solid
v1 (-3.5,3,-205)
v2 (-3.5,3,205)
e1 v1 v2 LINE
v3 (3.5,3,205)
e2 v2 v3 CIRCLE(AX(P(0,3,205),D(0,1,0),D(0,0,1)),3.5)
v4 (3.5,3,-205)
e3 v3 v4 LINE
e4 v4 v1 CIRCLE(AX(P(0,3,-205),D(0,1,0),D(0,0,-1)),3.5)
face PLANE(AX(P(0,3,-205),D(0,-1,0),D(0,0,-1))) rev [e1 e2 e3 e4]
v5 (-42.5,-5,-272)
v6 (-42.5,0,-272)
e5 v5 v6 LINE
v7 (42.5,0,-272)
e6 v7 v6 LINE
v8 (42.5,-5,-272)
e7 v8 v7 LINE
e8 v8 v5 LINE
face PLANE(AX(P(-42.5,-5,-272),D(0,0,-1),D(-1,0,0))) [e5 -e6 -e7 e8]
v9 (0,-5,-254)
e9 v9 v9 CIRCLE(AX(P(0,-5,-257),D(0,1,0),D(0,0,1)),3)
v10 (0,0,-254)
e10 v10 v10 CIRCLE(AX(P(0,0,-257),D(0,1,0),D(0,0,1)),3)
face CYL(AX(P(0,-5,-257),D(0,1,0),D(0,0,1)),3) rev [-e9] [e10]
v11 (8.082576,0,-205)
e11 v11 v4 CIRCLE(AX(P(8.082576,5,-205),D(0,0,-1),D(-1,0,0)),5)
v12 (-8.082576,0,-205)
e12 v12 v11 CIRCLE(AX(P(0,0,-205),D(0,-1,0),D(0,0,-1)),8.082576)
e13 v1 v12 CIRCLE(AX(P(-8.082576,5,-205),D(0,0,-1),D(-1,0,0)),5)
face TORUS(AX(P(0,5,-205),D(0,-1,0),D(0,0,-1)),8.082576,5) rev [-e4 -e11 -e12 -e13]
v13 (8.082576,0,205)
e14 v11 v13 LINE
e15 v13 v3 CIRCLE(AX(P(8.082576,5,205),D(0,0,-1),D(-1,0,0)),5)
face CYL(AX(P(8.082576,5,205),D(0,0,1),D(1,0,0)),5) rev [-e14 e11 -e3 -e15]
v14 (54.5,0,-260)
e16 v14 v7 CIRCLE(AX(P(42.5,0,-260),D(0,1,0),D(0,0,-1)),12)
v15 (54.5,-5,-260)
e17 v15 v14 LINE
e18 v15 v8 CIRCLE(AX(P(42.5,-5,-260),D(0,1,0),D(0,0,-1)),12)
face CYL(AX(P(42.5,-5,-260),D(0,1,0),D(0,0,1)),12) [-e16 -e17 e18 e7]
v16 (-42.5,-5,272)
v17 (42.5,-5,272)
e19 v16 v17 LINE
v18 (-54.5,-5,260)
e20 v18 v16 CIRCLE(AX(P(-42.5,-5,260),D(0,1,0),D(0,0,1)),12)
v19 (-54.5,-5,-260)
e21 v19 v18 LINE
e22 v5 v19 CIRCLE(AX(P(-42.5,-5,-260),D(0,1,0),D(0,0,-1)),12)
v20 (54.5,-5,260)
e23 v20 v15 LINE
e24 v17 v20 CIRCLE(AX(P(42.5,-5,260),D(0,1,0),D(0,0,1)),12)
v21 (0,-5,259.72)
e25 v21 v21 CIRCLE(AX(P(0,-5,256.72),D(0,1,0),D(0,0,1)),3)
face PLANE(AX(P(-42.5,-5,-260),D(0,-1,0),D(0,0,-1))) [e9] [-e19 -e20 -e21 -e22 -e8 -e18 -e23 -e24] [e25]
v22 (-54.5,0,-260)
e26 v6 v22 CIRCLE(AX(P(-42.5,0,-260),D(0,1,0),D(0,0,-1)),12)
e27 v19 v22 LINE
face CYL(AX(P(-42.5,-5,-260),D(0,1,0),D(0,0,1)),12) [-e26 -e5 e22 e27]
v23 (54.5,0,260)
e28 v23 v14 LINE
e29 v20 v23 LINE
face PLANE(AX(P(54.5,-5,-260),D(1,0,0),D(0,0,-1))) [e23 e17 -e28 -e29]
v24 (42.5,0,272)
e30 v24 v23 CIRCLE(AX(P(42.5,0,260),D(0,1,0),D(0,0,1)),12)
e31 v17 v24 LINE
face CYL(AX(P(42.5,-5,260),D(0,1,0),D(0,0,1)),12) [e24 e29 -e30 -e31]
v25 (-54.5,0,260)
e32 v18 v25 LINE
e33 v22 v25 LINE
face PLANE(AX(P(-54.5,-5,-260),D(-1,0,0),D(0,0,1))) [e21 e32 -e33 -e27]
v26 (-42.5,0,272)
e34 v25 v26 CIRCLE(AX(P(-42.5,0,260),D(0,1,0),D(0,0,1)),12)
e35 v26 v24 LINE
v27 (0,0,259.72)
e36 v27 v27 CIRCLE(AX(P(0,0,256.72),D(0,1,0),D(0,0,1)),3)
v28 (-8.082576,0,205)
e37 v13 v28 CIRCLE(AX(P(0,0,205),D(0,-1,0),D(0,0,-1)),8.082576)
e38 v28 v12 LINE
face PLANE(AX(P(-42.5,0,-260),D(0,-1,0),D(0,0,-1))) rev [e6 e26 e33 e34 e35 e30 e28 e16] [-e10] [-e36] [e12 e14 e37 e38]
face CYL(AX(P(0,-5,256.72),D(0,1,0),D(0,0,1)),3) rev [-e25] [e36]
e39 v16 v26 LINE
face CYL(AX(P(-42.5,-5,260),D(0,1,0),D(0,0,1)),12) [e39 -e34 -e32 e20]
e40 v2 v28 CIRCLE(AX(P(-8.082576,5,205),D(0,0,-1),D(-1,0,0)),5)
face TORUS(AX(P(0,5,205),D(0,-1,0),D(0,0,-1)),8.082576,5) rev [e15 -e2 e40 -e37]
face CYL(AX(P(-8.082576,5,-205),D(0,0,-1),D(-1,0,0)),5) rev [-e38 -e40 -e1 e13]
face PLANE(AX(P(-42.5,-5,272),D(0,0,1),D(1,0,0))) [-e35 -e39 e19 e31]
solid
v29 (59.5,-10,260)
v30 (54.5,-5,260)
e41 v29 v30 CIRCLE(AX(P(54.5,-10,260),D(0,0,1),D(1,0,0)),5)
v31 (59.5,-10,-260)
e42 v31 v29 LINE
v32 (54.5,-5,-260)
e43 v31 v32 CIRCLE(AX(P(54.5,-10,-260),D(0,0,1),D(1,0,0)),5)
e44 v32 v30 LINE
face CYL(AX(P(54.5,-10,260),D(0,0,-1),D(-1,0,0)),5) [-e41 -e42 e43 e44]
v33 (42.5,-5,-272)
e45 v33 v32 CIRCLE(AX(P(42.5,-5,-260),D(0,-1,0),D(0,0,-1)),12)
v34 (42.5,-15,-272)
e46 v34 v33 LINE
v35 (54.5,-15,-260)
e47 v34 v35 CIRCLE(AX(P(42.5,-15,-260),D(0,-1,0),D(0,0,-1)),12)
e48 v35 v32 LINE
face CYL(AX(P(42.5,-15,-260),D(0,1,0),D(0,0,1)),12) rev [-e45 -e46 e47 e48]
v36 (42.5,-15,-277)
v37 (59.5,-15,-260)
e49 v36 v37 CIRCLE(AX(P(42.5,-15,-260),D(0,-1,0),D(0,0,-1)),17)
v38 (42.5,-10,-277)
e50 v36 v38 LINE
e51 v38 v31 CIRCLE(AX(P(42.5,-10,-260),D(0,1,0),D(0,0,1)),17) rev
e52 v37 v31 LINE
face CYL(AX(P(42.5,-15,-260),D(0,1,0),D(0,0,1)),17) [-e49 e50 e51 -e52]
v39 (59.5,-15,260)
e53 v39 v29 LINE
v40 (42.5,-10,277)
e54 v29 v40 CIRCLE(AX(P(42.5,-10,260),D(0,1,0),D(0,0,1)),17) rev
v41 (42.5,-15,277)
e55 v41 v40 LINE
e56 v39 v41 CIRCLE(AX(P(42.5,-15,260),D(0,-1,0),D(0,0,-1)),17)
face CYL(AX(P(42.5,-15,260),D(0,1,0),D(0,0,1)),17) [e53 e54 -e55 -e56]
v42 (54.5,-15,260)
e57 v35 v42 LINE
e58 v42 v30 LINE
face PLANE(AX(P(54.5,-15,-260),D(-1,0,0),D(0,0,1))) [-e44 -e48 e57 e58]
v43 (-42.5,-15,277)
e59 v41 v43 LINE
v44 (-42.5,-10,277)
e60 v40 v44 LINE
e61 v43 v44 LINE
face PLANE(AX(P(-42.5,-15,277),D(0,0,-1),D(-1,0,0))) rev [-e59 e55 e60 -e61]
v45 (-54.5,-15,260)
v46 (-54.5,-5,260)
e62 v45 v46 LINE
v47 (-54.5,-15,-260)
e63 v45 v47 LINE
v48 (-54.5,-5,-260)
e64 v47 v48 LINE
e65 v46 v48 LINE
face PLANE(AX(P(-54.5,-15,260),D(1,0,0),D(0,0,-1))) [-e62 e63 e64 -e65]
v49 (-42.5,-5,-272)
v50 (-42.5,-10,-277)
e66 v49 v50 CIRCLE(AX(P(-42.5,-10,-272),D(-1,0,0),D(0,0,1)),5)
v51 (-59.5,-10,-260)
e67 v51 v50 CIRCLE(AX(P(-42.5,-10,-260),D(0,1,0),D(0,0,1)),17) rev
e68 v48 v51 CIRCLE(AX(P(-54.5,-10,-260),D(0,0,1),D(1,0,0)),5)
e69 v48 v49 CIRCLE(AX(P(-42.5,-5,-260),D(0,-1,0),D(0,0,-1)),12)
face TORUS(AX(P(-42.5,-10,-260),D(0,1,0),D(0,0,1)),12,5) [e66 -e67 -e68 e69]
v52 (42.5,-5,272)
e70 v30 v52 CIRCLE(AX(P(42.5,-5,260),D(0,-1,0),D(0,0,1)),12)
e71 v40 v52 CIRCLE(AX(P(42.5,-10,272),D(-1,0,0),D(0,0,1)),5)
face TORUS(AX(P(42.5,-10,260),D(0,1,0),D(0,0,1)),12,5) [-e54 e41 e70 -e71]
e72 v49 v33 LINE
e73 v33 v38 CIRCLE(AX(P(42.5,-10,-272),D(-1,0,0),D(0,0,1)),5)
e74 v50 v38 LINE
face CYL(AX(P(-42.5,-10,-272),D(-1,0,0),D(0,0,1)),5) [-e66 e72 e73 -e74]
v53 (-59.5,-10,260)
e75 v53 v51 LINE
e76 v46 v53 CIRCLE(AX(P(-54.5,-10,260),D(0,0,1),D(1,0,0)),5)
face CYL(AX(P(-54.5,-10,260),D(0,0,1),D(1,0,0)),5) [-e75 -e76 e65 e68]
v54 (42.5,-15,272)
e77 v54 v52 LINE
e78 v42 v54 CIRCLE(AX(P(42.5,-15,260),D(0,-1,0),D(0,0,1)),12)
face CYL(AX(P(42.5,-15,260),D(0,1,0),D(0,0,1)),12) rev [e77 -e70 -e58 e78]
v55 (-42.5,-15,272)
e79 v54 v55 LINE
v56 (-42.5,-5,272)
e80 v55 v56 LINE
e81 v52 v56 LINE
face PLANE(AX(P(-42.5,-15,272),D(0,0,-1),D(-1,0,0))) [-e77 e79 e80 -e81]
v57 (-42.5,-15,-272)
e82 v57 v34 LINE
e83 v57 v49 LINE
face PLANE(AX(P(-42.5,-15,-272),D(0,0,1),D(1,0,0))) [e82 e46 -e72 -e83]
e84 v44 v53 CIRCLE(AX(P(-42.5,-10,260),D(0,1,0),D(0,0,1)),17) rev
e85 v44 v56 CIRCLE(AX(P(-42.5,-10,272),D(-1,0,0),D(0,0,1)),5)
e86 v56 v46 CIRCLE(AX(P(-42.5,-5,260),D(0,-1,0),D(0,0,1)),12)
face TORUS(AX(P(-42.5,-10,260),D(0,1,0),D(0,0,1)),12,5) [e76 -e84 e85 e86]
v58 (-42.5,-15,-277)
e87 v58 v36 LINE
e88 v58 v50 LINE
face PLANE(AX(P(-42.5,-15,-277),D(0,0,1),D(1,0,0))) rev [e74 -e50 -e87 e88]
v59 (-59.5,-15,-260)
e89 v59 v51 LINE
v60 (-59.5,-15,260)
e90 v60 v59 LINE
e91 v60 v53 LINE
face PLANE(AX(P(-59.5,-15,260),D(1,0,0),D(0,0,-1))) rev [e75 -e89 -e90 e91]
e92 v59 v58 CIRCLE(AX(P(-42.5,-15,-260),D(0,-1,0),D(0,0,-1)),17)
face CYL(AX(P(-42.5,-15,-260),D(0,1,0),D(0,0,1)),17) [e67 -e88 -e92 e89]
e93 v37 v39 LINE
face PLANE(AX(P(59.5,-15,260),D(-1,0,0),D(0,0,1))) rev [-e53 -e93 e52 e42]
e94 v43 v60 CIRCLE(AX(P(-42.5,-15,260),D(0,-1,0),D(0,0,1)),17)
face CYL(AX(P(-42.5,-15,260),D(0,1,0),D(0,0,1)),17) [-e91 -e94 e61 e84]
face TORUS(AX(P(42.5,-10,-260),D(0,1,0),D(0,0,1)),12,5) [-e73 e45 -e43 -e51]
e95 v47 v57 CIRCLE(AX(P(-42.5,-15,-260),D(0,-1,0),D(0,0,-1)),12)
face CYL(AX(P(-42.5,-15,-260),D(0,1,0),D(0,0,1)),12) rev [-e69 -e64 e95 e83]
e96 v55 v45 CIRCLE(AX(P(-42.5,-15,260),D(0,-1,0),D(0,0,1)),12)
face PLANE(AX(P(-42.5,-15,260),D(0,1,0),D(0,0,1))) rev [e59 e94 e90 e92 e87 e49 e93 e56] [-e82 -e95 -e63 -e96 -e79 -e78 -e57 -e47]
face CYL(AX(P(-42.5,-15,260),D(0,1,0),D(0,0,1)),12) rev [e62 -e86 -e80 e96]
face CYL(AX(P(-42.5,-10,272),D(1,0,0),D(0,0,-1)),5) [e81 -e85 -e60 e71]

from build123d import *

# Parameters (mm, degrees)
SKETCH3_R           = 3
BOSS_EXTRUDE3_DEPTH = 5
BOSS_EXTRUDE4_DEPTH = 3
FILLET5_R           = 5
BOSS_EXTRUDE5_DEPTH = 10
FILLET7_R           = 5


# Some blends are built 0.0001 mm under size
with BuildPart() as part:
    # Sketch3 → Boss-Extrude3 (new body)
    with BuildSketch(Plane(origin=(0, 0, 0), x_dir=(1, 0, 0), z_dir=(0, 1, 0))):
        with BuildLine():
            Line((-42.5, 272), (42.5, 272))
            ThreePointArc((42.5, 272), (50.985281374, 268.485281374), (54.5, 260))
            Line((54.5, 260), (54.5, -260))
            ThreePointArc((54.5, -260), (50.985281374, -268.485281374), (42.5, -272))
            Line((42.5, -272), (-42.5, -272))
            ThreePointArc((-42.5, -272), (-50.985281374, -268.485281374), (-54.5, -260))
            Line((-54.5, -260), (-54.5, 260))
            ThreePointArc((-54.5, 260), (-50.985281374, 268.485281374), (-42.5, 272))
        make_face()
        with Locations(Location((0, 257, 0), (0, 0, 270))):
            Circle(SKETCH3_R, mode=Mode.SUBTRACT)
        with Locations(Location((0, -256.72, 0), (0, 0, 270))):
            Circle(SKETCH3_R, mode=Mode.SUBTRACT)
    extrude(amount=-BOSS_EXTRUDE3_DEPTH)

    # Sketch4 → Boss-Extrude4 (add)
    with BuildSketch(Plane(origin=(0, 0, 0), x_dir=(1, 0, 0), z_dir=(0, 1, 0))):
        with BuildLine():
            Line((-3.5, 205), (-3.5, -205))
            ThreePointArc((-3.5, -205), (0, -208.5), (3.5, -205))
            Line((3.5, -205), (3.5, 205))
            ThreePointArc((3.5, 205), (0, 208.5), (-3.5, 205))
        make_face()
    extrude(amount=BOSS_EXTRUDE4_DEPTH)

    # Fillet5
    # the kernel refuses this fillet: 5 mm, written as the material it adds along each edge
    with BuildSketch(Plane(origin=(0, 0, 205), x_dir=(-1, 0, 0), z_dir=(0, 0, -1))) as fillet5_piece_1:
        with BuildLine():
            CenterArc((8.082575695, 5), FILLET5_R, 203.578178478, 66.421821522)
            Line((3.5, 3), (3.408348486, 2.96))
            ThreePointArc((3.408348486, 2.96), (3.4, 1.5), (3.4, 0))
            Line((3.4, 0), (3.5, -0.1))
            Line((3.5, -0.1), (8.082575695, -0.1))
            Line((8.082575695, -0.1), (8.082575695, 0))
        make_face()
    revolve(axis=Axis((0, 0, 205), (0, 1, 0)), revolution_arc=180)
    with BuildSketch(Plane(origin=(-3.5, 0, -205), x_dir=(-1, 0, 0), z_dir=(0, 0, 1)), Plane(origin=(3.5, 0, 205), x_dir=(1, 0, 0), z_dir=(0, 0, -1))) as fillet5_piece_2:
        with BuildLine():
            CenterArc((4.582575695, -5), FILLET5_R, 90, 66.421821522)
            Line((0, -3), (-0.091651514, -2.96))
            ThreePointArc((-0.091651514, -2.96), (-0.1, -1.5), (-0.1, 0))
            Line((-0.1, 0), (0, 0.1))
            Line((0, 0.1), (4.582575695, 0.1))
            Line((4.582575695, 0.1), (4.582575695, 0))
        make_face()
    extrude(amount=410)
    with BuildSketch(Plane(origin=(0, 0, -205), x_dir=(1, 0, 0), z_dir=(0, 0, 1))) as fillet5_piece_3:
        with BuildLine():
            CenterArc((8.082575695, 5), FILLET5_R, 203.578178478, 66.421821522)
            Line((3.5, 3), (3.408348486, 2.96))
            ThreePointArc((3.408348486, 2.96), (3.4, 1.5), (3.4, 0))
            Line((3.4, 0), (3.5, -0.1))
            Line((3.5, -0.1), (8.082575695, -0.1))
            Line((8.082575695, -0.1), (8.082575695, 0))
        make_face()
    revolve(axis=Axis((0, 0, -205), (0, 1, 0)), revolution_arc=180)


with BuildPart() as body_2:
    # Sketch5 → Boss-Extrude5 (new body)
    with BuildSketch(Plane.XZ.offset(5)):
        with BuildLine():
            Line((-42.5, 277), (42.5, 277))
            ThreePointArc((42.5, 277), (54.52081528, 272.02081528), (59.5, 260))
            Line((59.5, 260), (59.5, -260))
            ThreePointArc((59.5, -260), (54.52081528, -272.02081528), (42.5, -277))
            Line((42.5, -277), (-42.5, -277))
            ThreePointArc((-42.5, -277), (-54.52081528, -272.02081528), (-59.5, -260))
            Line((-59.5, -260), (-59.5, 260))
            ThreePointArc((-59.5, 260), (-54.52081528, 272.02081528), (-42.5, 277))
        make_face()
        with BuildLine():
            Line((-54.5, 260), (-54.5, -260))
            ThreePointArc((-54.5, -260), (-50.985281374, -268.485281374), (-42.5, -272))
            Line((-42.5, -272), (42.5, -272))
            ThreePointArc((42.5, -272), (50.985281374, -268.485281374), (54.5, -260))
            Line((54.5, -260), (54.5, 260))
            ThreePointArc((54.5, 260), (50.985281374, 268.485281374), (42.5, 272))
            Line((42.5, 272), (-42.5, 272))
            ThreePointArc((-42.5, 272), (-50.985281374, 268.485281374), (-54.5, 260))
        make_face(mode=Mode.SUBTRACT)
    extrude(amount=BOSS_EXTRUDE5_DEPTH)

    # Fillet7
    fillet7_edges = [body_2.edges().sort_by_distance(p)[0] for p in [
        (0, -5, -277),
        (-54.52081528, -5, -272.02081528),
        (-59.5, -5, 0),
        (-54.52081528, -5, 272.02081528),
        (0, -5, 277),
        (54.52081528, -5, 272.02081528),
        (59.5, -5, 0),
        (54.52081528, -5, -272.02081528),
    ]]
    fillet(fillet7_edges, radius=FILLET7_R - 0.0001)  # a hair under: the kernel refuses the full size


solid = Compound([part.part, body_2.part])
